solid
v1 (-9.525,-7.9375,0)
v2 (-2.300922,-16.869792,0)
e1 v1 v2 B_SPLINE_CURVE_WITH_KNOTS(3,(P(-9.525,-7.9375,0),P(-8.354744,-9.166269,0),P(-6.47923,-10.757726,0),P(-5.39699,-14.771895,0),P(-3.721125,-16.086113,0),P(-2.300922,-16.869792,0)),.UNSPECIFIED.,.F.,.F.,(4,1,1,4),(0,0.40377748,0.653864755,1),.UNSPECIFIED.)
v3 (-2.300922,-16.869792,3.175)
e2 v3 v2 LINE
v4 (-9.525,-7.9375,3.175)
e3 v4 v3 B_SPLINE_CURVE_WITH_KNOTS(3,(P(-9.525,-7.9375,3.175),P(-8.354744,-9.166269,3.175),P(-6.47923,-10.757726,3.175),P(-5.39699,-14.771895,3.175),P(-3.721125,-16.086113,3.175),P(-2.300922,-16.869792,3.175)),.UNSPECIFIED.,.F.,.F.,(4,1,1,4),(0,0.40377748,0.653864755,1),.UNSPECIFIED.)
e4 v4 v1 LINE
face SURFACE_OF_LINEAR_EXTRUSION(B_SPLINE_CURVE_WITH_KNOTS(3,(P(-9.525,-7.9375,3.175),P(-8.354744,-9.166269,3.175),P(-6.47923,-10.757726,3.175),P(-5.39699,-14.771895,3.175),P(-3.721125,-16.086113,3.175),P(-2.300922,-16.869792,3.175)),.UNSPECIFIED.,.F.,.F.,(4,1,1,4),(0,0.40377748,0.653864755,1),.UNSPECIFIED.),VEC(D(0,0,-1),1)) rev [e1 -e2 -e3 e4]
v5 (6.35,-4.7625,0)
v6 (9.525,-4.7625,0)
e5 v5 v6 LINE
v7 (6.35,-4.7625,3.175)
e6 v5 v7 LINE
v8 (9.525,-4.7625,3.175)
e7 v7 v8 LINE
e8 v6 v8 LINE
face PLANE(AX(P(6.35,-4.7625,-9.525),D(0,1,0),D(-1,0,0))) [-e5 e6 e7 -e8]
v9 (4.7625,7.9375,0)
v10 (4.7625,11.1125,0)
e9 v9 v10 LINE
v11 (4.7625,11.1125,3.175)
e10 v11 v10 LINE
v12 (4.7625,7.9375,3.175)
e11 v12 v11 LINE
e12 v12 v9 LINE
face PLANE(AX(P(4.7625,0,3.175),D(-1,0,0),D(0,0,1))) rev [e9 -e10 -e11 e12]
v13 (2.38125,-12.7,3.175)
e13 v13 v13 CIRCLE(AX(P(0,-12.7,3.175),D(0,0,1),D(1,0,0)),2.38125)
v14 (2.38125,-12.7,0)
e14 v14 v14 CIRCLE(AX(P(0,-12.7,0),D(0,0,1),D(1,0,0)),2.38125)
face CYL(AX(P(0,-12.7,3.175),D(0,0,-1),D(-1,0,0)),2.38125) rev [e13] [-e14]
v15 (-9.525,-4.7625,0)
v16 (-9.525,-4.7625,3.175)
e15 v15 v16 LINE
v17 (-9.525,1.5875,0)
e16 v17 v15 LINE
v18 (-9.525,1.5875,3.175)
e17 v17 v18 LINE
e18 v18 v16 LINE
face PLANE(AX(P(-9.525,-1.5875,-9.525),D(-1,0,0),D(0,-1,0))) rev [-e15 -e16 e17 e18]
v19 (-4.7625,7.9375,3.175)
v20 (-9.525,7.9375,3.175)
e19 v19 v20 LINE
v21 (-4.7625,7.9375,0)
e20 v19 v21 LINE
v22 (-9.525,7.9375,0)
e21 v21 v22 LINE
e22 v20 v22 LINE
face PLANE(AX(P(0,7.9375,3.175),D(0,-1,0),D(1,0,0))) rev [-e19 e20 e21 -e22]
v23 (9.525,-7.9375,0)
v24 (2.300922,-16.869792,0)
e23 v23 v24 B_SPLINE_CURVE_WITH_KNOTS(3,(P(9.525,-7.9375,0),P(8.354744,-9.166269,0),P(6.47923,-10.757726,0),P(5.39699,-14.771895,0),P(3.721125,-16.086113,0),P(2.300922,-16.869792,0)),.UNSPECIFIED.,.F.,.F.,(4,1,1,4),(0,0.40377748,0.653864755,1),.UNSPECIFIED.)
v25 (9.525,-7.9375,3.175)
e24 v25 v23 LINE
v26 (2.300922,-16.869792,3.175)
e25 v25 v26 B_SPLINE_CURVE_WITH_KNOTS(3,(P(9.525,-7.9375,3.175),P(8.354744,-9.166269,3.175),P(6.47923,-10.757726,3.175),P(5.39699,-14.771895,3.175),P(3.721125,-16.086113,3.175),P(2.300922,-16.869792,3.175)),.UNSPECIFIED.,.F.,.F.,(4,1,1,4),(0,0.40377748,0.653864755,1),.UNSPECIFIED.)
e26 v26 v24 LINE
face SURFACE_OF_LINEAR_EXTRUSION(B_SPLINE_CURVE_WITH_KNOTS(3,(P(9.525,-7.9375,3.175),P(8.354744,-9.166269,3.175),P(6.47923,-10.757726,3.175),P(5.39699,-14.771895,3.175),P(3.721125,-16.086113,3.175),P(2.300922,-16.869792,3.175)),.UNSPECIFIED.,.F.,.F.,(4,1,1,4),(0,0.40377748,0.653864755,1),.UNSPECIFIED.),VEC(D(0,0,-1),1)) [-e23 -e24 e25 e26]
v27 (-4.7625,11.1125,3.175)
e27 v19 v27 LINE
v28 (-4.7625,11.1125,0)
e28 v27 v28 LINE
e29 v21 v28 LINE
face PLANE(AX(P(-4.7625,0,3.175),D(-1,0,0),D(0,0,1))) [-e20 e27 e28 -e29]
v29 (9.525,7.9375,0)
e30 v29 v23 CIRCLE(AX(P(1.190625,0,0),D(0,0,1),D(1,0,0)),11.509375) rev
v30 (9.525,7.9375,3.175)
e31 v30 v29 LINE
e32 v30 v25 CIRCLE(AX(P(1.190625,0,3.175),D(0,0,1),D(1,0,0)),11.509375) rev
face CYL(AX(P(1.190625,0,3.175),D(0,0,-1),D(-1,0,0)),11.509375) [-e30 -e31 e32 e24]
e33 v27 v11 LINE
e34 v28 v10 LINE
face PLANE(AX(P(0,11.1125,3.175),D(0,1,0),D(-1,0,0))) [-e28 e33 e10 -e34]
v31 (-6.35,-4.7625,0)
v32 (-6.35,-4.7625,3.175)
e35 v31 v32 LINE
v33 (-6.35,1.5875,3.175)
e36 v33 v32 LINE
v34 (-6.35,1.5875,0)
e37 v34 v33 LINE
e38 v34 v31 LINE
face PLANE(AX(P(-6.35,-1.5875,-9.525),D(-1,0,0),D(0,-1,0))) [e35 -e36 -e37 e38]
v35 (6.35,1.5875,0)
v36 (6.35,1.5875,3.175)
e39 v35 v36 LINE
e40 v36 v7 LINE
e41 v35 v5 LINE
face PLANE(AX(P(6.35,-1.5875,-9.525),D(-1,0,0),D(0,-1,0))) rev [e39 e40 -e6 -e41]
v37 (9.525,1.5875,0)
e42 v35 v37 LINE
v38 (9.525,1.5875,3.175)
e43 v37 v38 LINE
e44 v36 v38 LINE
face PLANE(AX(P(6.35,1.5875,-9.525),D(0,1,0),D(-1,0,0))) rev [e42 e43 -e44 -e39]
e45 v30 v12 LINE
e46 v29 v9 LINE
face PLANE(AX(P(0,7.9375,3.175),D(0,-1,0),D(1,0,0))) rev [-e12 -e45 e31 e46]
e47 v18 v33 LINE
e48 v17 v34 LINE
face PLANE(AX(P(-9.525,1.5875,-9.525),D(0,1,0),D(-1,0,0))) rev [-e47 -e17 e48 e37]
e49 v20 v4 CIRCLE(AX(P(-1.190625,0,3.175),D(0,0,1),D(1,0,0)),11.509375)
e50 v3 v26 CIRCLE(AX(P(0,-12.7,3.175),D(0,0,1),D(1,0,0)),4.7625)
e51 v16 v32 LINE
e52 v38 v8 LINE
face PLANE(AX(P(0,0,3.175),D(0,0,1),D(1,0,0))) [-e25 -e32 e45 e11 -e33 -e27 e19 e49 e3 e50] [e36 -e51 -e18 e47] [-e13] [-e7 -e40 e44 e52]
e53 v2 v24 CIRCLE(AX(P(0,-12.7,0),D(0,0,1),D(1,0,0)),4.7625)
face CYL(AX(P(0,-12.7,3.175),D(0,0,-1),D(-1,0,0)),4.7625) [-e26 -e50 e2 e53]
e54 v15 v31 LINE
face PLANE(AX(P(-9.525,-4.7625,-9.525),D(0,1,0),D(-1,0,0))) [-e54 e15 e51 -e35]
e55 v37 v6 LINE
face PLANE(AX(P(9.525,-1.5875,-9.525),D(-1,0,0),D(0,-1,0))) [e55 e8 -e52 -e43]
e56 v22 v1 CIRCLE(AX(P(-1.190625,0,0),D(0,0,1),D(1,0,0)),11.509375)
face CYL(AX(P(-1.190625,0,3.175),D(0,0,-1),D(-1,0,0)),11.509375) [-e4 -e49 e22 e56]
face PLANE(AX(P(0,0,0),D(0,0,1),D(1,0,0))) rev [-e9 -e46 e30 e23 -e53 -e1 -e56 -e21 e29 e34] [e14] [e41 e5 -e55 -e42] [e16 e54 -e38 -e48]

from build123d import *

# Parameters (mm, degrees)
SKETCH1_W           = 9.525
SKETCH1_H           = 3.175
SKETCH1_R           = 2.38125
BOSS_EXTRUDE1_DEPTH = 3.175
CAVITY1_START       = -9.525
CAVITY1_OUTLINE_W   = 6.35
CAVITY1_OUTLINE_H   = 3.175
CAVITY1_DEPTH       = 3.175
CAVITY1_START_2     = 6.35
CAVITY1_2_OUTLINE_W = 6.35
CAVITY1_2_OUTLINE_H = 3.175
CAVITY1_2_DEPTH     = 3.175


# Read off the part's stored shape, not the designer's step: Cavity1
with BuildPart() as part:
    # Sketch1 → Boss-Extrude1 (new body)
    # profile 1 of 10: a face of its own
    with BuildSketch(Plane.XY):
        with BuildLine():
            ThreePointArc((-9.525, 7.9375), (-11.876811414, 4.274474566), (-12.7, 0))
            Line((-12.7, 0), (-9.525, 0))
            Line((-9.525, 0), (-9.525, 7.9375))
        make_face()
    # profile 2 of 10: a face of its own
    with BuildSketch(Plane.XY):
        with BuildLine():
            Line((-9.525, 0), (-12.7, 0))
            ThreePointArc((-12.7, 0), (-11.876811414, -4.274474566), (-9.525, -7.9375))
            Line((-9.525, -7.9375), (-9.525, 0))
        make_face()
    # profile 3 of 10: a face of its own
    with BuildSketch(Plane.XY):
        Polygon((-9.525, 7.9375), (-9.525, 0), (0, 0), (9.525, 0), (9.525, 7.9375), (4.7625, 7.9375), (-4.7625, 7.9375), align=None)
    # profile 4 of 10: a face of its own
    with BuildSketch(Plane.XY):
        Polygon((0, 0), (-9.525, 0), (-9.525, -7.9375), (0, -7.9375), (9.525, -7.9375), (9.525, 0), align=None)
    # profile 5 of 10: a face of its own
    with BuildSketch(Plane.XY):
        with BuildLine():
            Line((0, -7.9375), (-9.525, -7.9375))
            add(Edge.make_bspline(
                [(-9.525, -7.9375), (-8.354743729, -9.166269084), (-6.479229503, -10.75772626), (-5.396989703, -14.77189499), (-3.721125314, -16.086113374), (-2.300921541, -16.869792119)],
                knots=[0, 0, 0, 0, 0.40377748, 0.653864755, 1, 1, 1, 1], degree=3))
            ThreePointArc((-2.300921541, -16.869792119), (-4.611943257, -11.511982474), (0, -7.9375))
        make_face()
    # profile 6 of 10: a face of its own
    with BuildSketch(Plane.XY):
        with Locations((0, 9.525)):
            Rectangle(SKETCH1_W, SKETCH1_H)
    # profile 7 of 10: a face of its own
    with BuildSketch(Plane.XY):
        with BuildLine():
            Line((9.525, -7.9375), (0, -7.9375))
            ThreePointArc((0, -7.9375), (3.367596045, -9.332403955), (4.7625, -12.7))
            ThreePointArc((4.7625, -12.7), (4.1011916, -15.121081103), (2.300921541, -16.869792119))
            add(Edge.make_bspline(
                [(9.525, -7.9375), (8.354743729, -9.166269084), (6.479229503, -10.75772626), (5.396989703, -14.77189499), (3.721125314, -16.086113374), (2.300921541, -16.869792119)],
                knots=[0, 0, 0, 0, 0.40377748, 0.653864755, 1, 1, 1, 1], degree=3))
        make_face()
    # profile 8 of 10: a face of its own
    with BuildSketch(Plane.XY):
        with BuildLine():
            ThreePointArc((4.7625, -12.7), (3.367596045, -9.332403955), (0, -7.9375))
            ThreePointArc((0, -7.9375), (-4.611943257, -11.511982474), (-2.300921541, -16.869792119))
            ThreePointArc((-2.300921541, -16.869792119), (0, -17.4625), (2.300921541, -16.869792119))
            ThreePointArc((2.300921541, -16.869792119), (4.1011916, -15.121081103), (4.7625, -12.7))
        make_face()
        with Locations((0, -12.7)):
            Circle(SKETCH1_R, mode=Mode.SUBTRACT)
    # profile 9 of 10: a face of its own
    with BuildSketch(Plane.XY):
        with BuildLine():
            Line((9.525, 7.9375), (9.525, 0))
            Line((9.525, 0), (12.7, 0))
            ThreePointArc((12.7, 0), (11.876811414, 4.274474566), (9.525, 7.9375))
        make_face()
    # profile 10 of 10: a face of its own
    with BuildSketch(Plane.XY):
        with BuildLine():
            Line((12.7, 0), (9.525, 0))
            Line((9.525, 0), (9.525, -7.9375))
            ThreePointArc((9.525, -7.9375), (11.876811414, -4.274474566), (12.7, 0))
        make_face()
    extrude(amount=BOSS_EXTRUDE1_DEPTH)

    # Cavity1 outline → Cavity1 (cut)
    with BuildSketch(Plane.YZ.offset(CAVITY1_START)):
        with Locations((-1.5875, 1.5875)):
            Rectangle(CAVITY1_OUTLINE_W, CAVITY1_OUTLINE_H)
    extrude(amount=CAVITY1_DEPTH, mode=Mode.SUBTRACT)

    # Cavity1 2 outline → Cavity1 2 (cut)
    with BuildSketch(Plane.YZ.offset(CAVITY1_START_2)):
        with Locations((-1.5875, 1.5875)):
            Rectangle(CAVITY1_2_OUTLINE_W, CAVITY1_2_OUTLINE_H)
    extrude(amount=CAVITY1_2_DEPTH, mode=Mode.SUBTRACT)


solid = part.part
